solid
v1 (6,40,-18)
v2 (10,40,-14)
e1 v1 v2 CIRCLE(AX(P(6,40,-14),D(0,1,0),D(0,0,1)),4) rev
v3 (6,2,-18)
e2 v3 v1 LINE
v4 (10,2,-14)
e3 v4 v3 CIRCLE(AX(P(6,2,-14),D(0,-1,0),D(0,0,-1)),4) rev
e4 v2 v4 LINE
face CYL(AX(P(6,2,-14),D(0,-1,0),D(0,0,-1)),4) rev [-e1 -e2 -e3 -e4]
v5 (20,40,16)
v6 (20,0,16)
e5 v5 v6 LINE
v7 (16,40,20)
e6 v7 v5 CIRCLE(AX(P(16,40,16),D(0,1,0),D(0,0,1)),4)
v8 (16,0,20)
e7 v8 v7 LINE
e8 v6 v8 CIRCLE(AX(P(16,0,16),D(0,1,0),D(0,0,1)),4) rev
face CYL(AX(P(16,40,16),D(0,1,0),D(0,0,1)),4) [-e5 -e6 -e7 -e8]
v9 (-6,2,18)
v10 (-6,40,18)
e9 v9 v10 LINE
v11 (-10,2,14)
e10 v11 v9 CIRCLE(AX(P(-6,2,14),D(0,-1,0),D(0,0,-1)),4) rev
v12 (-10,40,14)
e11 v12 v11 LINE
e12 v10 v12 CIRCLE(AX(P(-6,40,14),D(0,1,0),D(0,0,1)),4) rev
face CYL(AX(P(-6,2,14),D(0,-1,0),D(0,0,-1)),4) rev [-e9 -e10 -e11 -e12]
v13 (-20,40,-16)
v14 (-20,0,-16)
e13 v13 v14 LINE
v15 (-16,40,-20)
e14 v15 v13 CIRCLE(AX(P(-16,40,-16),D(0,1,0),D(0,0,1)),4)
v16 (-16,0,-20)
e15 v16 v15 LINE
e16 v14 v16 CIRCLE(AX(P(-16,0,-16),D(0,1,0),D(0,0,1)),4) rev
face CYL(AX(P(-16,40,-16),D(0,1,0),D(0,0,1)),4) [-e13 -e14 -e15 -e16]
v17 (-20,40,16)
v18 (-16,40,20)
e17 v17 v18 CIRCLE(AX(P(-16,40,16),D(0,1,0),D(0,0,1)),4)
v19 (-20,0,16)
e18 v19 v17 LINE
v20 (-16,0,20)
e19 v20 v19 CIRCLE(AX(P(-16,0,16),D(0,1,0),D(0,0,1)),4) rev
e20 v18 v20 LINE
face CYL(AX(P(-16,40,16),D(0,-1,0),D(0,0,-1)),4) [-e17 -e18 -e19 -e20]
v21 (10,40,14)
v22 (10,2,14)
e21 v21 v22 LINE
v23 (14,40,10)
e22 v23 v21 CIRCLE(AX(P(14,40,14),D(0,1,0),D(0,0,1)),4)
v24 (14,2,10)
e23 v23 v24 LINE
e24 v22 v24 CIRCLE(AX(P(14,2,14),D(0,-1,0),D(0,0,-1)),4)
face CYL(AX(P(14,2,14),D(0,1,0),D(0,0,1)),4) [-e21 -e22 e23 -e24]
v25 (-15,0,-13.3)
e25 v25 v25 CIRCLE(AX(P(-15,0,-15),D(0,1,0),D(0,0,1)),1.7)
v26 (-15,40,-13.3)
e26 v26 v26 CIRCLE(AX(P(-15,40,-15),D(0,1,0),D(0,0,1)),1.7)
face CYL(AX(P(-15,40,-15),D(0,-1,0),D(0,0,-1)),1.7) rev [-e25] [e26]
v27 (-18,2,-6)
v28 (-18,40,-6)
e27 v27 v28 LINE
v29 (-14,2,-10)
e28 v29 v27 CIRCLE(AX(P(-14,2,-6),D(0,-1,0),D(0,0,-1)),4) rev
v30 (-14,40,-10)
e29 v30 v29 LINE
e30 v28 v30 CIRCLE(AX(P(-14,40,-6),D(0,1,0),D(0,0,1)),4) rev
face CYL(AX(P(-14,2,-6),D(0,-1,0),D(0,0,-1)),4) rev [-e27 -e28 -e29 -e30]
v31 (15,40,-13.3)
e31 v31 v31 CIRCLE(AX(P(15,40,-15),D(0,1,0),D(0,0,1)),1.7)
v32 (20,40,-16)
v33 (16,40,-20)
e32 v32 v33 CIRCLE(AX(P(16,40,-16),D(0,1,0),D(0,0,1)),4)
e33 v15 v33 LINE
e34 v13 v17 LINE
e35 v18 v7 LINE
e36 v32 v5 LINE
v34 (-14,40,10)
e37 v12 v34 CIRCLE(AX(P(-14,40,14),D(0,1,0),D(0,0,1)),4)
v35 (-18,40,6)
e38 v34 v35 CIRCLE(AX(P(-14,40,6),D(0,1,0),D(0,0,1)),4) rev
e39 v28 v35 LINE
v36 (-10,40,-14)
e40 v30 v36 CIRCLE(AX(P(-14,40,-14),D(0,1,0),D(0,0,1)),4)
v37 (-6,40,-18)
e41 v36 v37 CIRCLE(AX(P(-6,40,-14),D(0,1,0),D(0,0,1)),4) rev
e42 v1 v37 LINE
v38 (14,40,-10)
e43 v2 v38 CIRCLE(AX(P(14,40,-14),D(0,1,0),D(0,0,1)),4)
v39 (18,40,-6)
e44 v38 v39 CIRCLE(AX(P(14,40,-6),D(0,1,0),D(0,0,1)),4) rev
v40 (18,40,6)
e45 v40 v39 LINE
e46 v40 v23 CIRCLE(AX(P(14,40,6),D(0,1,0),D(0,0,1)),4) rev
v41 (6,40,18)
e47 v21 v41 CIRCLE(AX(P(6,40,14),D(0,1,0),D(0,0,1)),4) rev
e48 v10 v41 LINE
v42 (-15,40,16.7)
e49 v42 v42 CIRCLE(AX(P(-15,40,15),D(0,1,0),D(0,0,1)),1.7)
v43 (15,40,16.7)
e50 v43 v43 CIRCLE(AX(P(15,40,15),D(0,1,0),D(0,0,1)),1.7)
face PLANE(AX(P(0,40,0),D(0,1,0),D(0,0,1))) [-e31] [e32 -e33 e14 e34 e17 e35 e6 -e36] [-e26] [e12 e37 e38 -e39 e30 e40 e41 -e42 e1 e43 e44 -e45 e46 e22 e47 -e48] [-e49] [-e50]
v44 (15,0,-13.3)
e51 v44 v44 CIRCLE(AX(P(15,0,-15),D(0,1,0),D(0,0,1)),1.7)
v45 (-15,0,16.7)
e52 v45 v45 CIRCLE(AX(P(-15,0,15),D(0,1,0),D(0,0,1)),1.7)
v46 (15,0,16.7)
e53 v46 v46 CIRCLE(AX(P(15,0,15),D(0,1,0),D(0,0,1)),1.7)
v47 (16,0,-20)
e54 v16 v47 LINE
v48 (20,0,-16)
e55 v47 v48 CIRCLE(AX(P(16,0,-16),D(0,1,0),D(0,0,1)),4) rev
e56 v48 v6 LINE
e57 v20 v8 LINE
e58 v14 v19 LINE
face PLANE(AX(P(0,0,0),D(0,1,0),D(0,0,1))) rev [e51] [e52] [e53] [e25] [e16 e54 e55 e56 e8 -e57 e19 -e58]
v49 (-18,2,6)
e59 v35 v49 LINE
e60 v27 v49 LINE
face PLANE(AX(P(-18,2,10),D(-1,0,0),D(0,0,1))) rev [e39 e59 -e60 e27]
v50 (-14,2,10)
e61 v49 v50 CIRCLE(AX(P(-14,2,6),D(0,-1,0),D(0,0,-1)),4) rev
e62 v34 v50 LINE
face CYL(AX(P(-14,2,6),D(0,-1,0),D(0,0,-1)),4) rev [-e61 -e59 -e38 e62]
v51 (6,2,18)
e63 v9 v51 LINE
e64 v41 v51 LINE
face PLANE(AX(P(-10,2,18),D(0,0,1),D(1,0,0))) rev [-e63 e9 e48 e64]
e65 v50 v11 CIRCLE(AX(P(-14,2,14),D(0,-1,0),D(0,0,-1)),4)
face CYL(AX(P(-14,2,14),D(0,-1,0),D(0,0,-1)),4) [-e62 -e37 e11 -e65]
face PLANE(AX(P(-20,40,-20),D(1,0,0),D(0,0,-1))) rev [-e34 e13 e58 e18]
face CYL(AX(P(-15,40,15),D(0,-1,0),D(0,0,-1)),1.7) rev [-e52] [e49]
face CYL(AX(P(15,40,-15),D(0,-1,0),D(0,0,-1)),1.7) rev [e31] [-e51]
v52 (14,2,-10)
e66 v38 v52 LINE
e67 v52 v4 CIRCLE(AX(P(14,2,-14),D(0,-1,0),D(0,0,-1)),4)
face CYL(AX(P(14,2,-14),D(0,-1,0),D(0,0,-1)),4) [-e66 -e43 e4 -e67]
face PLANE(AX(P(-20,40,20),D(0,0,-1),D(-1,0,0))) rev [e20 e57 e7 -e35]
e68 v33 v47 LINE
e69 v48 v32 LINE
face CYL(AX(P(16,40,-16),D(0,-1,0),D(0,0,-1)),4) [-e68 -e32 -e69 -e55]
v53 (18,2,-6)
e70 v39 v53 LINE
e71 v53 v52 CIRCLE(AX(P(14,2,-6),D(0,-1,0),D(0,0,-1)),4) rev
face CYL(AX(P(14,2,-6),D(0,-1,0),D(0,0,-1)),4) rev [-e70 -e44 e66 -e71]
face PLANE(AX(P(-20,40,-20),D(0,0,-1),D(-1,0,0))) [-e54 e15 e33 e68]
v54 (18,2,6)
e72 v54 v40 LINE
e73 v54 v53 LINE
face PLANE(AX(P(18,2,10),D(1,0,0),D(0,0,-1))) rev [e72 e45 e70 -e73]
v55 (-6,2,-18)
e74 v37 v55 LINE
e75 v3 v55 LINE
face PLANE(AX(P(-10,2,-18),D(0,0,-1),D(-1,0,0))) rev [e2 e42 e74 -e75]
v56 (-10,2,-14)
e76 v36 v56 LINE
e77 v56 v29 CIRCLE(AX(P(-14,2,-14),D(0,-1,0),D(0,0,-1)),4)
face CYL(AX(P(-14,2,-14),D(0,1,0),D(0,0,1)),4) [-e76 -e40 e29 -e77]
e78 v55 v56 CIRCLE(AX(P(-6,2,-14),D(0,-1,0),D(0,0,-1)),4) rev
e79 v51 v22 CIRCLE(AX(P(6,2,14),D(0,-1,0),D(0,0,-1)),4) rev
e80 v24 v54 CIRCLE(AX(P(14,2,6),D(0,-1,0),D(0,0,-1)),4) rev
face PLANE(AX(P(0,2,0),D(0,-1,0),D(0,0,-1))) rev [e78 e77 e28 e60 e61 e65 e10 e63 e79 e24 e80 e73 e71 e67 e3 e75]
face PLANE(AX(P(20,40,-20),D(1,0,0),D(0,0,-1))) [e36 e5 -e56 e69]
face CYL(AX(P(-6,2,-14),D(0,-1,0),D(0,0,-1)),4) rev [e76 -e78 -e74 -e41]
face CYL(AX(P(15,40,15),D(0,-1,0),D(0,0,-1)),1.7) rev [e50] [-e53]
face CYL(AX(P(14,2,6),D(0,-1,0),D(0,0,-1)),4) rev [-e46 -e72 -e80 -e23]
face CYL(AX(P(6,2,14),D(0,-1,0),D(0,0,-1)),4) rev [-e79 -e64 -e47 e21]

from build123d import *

# Parameters (mm, degrees)
SKETCH1_W           = 40
SKETCH1_H           = 40
SKETCH1_R           = 1.7
BOSS_EXTRUDE1_DEPTH = 40
SKETCH2_W           = 36
SKETCH2_H           = 20
CUT_EXTRUDE1_DEPTH  = 38
CIRPATTERN1_COUNT   = 2
CIRPATTERN1_ANGLE   = 90
FILLET1_R           = 4


with BuildPart() as part:
    # Sketch1 → Boss-Extrude1 (new body)
    with BuildSketch(Plane(origin=(0, 0, 0), x_dir=(1, 0, 0), z_dir=(0, 1, 0))):
        Rectangle(SKETCH1_W, SKETCH1_H)
        with Locations(Location((15, 15, 0), (0, 0, 270))):
            Circle(SKETCH1_R, mode=Mode.SUBTRACT)
        with Locations(Location((-15, 15, 0), (0, 0, 270))):
            Circle(SKETCH1_R, mode=Mode.SUBTRACT)
        with Locations(Location((-15, -15, 0), (0, 0, 270))):
            Circle(SKETCH1_R, mode=Mode.SUBTRACT)
        with Locations(Location((15, -15, 0), (0, 0, 270))):
            Circle(SKETCH1_R, mode=Mode.SUBTRACT)
    extrude(amount=BOSS_EXTRUDE1_DEPTH)

    # Sketch2 → Cut-Extrude1 (cut)
    with BuildSketch(Plane(origin=(0, 40, 0), x_dir=(1, 0, 0), z_dir=(0, 1, 0))):
        Rectangle(SKETCH2_W, SKETCH2_H)
    cut_extrude1 = extrude(amount=-CUT_EXTRUDE1_DEPTH, mode=Mode.SUBTRACT)

    # CirPattern1: Cut-Extrude1 ×2 about axis
    cirpattern1_axis = Axis((0, 0, 0), (0, -1, 0))
    for i in range(1, CIRPATTERN1_COUNT):
        add(cut_extrude1.rotate(cirpattern1_axis, i * CIRPATTERN1_ANGLE / (CIRPATTERN1_COUNT - 1)), mode=Mode.SUBTRACT)

    # Fillet1
    fillet1_edges = [part.edges().sort_by_distance(p)[0] for p in [
        (-18, 21, 10),
        (-10, 21, 10),
        (-10, 21, 18),
        (10, 21, 18),
        (10, 21, 10),
        (18, 21, 10),
        (18, 21, -10),
        (10, 21, -10),
        (10, 21, -18),
        (-10, 21, -18),
        (-18, 21, -10),
        (-10, 21, -10),
        (-20, 20, -20),
        (20, 20, -20),
        (20, 20, 20),
        (-20, 20, 20),
    ]]
    fillet(fillet1_edges, radius=FILLET1_R - 0.0001)  # a hair under: the kernel refuses the full size


solid = part.part
